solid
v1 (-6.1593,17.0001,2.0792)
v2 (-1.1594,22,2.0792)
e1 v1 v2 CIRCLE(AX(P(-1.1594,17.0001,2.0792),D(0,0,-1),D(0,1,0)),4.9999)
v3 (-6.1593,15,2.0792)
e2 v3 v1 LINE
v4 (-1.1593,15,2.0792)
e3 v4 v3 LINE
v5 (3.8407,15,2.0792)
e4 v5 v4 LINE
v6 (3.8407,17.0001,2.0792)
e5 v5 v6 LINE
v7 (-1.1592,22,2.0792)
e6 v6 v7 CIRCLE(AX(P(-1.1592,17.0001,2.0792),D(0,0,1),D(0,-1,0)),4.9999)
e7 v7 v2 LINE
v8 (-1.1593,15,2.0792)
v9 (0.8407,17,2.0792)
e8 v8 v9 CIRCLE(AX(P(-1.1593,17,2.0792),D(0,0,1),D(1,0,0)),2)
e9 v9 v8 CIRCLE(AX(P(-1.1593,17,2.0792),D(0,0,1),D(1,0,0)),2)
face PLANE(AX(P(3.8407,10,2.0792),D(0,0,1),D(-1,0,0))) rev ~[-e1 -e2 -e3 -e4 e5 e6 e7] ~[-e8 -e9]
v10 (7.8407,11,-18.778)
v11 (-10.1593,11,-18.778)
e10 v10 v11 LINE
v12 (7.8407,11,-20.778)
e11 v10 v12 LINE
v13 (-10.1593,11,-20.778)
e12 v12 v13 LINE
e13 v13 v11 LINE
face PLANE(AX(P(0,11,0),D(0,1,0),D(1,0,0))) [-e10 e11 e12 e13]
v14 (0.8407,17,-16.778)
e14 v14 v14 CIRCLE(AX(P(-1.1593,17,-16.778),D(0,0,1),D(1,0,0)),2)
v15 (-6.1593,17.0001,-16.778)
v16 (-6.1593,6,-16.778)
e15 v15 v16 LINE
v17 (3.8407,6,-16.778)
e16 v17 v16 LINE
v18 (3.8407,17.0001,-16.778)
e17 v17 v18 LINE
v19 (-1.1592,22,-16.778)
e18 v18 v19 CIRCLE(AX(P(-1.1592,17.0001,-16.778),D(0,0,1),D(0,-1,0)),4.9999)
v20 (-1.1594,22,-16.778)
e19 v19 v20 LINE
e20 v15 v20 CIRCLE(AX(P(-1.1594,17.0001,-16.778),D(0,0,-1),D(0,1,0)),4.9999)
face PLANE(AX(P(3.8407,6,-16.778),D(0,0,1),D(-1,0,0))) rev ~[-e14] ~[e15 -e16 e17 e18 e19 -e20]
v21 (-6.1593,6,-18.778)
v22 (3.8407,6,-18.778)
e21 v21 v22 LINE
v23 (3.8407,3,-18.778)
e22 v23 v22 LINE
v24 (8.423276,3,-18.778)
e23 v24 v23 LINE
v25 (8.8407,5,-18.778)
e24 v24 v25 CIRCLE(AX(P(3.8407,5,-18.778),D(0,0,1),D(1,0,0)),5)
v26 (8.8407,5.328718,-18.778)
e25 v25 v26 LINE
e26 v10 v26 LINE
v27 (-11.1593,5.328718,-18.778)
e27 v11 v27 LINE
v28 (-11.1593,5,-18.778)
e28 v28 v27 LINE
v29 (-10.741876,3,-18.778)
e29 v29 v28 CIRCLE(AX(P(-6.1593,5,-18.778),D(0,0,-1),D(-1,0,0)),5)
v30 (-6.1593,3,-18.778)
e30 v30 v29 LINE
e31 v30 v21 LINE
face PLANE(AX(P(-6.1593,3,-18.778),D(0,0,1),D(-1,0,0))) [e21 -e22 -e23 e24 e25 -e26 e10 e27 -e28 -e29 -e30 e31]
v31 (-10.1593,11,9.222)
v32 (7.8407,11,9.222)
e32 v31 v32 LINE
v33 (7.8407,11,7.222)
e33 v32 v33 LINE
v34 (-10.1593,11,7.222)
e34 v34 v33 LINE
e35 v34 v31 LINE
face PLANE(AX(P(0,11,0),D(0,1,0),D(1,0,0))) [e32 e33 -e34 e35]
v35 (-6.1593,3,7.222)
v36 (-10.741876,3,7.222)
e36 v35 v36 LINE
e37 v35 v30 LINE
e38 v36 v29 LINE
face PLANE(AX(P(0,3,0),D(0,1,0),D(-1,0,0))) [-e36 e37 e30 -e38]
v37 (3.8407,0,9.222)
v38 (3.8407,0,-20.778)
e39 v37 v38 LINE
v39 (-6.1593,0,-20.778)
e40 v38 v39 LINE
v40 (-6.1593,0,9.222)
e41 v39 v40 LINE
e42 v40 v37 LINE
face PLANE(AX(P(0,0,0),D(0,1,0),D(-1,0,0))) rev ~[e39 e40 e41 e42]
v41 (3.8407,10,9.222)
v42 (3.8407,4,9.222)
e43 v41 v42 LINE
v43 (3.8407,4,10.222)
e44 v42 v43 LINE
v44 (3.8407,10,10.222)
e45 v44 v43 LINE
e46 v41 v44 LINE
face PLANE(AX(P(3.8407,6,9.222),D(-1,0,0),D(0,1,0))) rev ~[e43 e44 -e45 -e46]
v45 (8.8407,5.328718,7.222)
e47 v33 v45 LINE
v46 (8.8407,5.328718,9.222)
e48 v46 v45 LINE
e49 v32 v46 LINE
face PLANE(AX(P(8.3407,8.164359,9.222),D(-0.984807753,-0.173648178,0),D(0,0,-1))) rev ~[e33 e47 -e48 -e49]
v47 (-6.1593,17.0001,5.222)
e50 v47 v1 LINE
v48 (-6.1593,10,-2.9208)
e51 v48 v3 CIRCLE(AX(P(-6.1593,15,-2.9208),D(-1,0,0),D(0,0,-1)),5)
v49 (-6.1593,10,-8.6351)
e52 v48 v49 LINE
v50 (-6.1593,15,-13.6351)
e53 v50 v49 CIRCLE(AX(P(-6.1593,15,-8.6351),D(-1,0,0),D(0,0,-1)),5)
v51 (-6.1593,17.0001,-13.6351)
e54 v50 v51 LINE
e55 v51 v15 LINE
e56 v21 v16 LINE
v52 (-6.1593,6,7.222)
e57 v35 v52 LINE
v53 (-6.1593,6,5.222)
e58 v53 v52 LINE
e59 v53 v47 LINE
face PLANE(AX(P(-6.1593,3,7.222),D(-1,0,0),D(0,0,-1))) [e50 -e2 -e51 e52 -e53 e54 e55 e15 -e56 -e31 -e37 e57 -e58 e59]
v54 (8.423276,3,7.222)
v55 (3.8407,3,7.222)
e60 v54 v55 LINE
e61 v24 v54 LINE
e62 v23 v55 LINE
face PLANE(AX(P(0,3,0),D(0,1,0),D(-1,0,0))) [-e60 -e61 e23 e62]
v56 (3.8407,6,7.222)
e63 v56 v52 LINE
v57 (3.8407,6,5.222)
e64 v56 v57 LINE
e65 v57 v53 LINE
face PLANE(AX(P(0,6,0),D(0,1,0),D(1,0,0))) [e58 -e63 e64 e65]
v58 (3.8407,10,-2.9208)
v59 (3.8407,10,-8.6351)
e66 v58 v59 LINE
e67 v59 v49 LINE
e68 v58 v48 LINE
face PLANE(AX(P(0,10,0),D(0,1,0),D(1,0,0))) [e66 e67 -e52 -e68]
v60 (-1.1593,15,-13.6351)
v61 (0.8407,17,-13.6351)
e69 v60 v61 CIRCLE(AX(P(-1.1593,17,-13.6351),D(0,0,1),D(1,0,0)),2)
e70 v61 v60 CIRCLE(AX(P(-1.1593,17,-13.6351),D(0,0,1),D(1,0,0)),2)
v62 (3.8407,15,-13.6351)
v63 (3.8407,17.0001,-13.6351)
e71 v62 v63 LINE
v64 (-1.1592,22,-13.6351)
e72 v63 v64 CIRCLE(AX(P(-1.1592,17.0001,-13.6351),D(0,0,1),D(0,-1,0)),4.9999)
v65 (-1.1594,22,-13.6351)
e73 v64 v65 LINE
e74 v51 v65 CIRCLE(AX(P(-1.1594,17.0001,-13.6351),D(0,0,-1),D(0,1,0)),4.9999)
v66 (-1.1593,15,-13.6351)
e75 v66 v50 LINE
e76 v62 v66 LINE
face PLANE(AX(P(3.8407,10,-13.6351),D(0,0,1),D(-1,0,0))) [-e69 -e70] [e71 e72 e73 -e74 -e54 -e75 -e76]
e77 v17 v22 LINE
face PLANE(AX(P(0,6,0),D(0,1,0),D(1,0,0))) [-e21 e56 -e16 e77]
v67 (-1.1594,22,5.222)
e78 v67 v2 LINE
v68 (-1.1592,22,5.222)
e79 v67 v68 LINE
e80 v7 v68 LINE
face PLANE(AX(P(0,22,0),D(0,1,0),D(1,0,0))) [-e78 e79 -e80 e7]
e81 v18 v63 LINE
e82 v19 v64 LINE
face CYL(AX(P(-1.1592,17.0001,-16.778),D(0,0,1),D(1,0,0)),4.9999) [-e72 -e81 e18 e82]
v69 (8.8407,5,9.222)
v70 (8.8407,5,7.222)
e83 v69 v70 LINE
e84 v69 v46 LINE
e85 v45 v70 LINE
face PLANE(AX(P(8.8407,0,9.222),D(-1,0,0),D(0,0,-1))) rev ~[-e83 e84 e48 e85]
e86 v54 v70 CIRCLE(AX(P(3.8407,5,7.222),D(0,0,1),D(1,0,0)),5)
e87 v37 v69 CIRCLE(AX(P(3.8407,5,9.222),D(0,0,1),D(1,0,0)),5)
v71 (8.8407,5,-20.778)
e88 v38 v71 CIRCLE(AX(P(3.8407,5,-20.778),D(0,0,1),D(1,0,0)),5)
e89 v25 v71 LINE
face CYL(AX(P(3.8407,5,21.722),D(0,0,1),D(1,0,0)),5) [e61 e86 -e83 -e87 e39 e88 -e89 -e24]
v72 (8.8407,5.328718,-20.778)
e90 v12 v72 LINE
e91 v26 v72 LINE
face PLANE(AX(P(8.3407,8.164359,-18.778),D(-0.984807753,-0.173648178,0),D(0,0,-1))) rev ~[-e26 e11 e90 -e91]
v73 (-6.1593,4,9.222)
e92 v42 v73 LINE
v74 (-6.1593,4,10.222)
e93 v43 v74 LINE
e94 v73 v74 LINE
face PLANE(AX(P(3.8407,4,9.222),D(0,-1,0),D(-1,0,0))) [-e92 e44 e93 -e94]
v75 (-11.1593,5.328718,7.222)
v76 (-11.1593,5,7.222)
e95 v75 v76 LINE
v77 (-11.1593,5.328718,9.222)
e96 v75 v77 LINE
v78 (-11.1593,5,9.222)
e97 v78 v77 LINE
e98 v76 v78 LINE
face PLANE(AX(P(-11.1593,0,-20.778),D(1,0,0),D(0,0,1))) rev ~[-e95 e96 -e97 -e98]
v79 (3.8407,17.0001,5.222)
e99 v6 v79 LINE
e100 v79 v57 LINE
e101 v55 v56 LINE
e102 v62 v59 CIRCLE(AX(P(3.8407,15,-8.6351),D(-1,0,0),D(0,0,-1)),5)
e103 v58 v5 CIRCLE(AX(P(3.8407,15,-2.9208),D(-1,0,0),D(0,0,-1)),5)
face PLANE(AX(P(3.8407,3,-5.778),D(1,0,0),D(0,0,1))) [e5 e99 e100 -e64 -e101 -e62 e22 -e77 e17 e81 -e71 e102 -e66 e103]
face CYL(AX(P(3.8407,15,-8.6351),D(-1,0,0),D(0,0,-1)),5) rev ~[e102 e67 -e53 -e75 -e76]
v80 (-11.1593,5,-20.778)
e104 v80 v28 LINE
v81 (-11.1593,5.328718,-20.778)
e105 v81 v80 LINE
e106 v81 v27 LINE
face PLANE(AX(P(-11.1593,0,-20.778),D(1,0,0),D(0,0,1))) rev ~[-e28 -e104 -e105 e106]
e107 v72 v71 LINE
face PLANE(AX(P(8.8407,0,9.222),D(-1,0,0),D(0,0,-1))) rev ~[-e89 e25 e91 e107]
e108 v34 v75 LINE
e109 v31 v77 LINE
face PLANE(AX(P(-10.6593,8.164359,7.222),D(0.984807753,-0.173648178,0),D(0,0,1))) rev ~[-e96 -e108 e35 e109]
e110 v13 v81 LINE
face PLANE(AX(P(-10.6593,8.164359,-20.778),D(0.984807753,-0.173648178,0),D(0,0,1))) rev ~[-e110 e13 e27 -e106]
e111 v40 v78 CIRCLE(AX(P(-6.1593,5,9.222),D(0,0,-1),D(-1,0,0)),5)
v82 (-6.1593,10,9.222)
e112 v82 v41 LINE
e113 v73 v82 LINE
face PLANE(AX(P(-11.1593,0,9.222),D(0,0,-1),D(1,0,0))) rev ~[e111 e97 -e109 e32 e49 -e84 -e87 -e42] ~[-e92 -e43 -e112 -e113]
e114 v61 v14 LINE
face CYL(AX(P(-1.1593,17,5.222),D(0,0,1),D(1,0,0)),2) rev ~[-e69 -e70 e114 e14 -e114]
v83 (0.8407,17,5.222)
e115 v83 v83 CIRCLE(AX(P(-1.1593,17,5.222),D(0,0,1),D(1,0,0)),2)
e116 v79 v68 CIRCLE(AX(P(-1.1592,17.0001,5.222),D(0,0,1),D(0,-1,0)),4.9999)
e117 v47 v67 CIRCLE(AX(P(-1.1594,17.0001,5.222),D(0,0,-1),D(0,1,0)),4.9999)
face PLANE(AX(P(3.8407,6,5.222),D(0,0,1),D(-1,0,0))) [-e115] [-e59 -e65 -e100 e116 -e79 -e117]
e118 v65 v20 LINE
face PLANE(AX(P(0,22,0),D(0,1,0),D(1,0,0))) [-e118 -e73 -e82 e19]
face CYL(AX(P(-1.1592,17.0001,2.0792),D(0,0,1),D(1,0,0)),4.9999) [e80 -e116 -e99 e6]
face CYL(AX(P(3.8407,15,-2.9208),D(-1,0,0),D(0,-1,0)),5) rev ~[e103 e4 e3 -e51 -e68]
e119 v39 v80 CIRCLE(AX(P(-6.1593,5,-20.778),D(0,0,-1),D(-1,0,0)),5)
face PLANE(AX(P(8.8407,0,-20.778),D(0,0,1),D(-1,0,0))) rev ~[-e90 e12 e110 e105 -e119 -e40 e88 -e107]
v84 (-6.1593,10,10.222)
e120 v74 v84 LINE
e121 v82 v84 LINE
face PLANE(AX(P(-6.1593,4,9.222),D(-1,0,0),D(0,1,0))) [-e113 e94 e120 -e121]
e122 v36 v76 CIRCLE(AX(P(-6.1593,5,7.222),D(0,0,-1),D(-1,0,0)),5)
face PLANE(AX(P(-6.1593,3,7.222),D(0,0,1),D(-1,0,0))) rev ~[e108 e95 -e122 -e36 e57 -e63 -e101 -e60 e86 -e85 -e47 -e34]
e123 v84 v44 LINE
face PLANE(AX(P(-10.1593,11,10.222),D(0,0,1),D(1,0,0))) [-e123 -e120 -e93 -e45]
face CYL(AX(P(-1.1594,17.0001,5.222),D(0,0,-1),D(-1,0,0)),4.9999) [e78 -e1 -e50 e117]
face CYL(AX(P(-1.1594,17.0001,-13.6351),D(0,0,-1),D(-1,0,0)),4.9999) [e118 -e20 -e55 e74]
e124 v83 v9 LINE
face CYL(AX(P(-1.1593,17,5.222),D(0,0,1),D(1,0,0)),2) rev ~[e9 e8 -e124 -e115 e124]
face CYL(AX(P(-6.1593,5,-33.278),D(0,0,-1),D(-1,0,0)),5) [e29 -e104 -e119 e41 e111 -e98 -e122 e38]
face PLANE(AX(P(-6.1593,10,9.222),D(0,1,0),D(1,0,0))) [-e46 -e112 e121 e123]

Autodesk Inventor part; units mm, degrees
ref_plane "YZ Plane" through (0, 0, 0) normal (1, 0, 0) x (0, 1, 0)
ref_plane "XZ Plane" through (0, 0, 0) normal (0, 1, 0) x (-1, 0, 0)
sketch "Sketch2" plane through (0, 0, 0) normal (0, 1, 0) x (-1, 0, 0)
  line L0 (11.1593, 9.222) -> (-8.8407, 9.222)
  line L1 (-8.8407, 9.222) -> (-8.8407, -20.778)
  line L2 (-8.8407, -20.778) -> (11.1593, -20.778)
  line L3 (11.1593, -20.778) -> (11.1593, 9.222)
  point P0 (0, 0)
  dimension "d23" = 30
  dimension "d24" = 20
extrude "Extrusion2" add sketch "Sketch2" along normal blind 3
sketch "Sketch3" plane through (0, 3, 0) normal (0, 1, 0) x (1, 0, 0)
  line L0 (8.8407, -9.222) -> (8.8407, 20.778) projected
  line L1 (8.8407, 20.778) -> (-11.1593, 20.778) projected
  line L2 (-11.1593, 20.778) -> (-11.1593, -9.222) projected
  line L3 (-11.1593, -9.222) -> (8.8407, -9.222) projected
  line L4 (8.8407, -9.222) -> (8.8407, 20.778) projected
  line L5 (8.8407, 5.778) -> (-11.1593, 5.778)
  line L6 (-11.1593, 20.778) -> (-11.1593, -9.222) projected
  line L7 (8.8407, -7.222) -> (-11.1593, -7.222)
  line L8 (3.8407, -7.222) -> (-6.1593, -7.222)
  line L9 (-6.1593, -7.222) -> (-6.1593, 5.778)
  line L10 (-6.1593, 5.778) -> (3.8407, 5.778)
  line L11 (3.8407, 5.778) -> (3.8407, -7.222)
  line L12 (8.8407, 20.778) -> (8.8407, -9.222)
  line L13 (-11.1593, -9.222) -> (-11.1593, 20.778)
  line L14 (-11.1593, 20.778) -> (8.8407, 20.778)
  line L15 (8.8407, 20.778) -> (8.8407, -9.222)
  line L16 (-11.1593, -9.222) -> (-11.1593, 20.778)
  line L17 (8.8407, 18.778) -> (-11.1593, 18.778)
  line L18 (3.8407, 18.778) -> (-6.1593, 18.778)
  line L19 (-6.1593, 18.778) -> (-6.1593, 5.778)
  line L20 (3.8407, 5.778) -> (3.8407, 18.778)
  point P0 (0, 0)
  point P1 (8.8407, 18.778)
  point P2 (-11.1593, 18.778)
  point P3 (-6.1593, 18.778)
  point P4 (-6.1593, -7.222)
  dimension "d27" = 2
  dimension "d28" = 10
  dimension "d29" = 5
  dimension "d53" = 20
extrude "Extrusion3" add sketch "Sketch3" along normal blind 3 contours L3 L2 L7 L0 | L7 L9 L5 L11 | L17 L2 L1 L0 | L5 L19 L17 L20
sketch "Sketch4" plane through (0, 6, 0) normal (0, 1, 0) x (1, 0, 0)
  line L0 (8.8407, -7.222) -> (3.8407, -7.222) projected
  line L1 (8.8407, -9.222) -> (8.8407, -7.222) projected
  line L2 (8.8407, -7.222) -> (3.8407, -7.222) projected
  line L3 (3.8407, -7.222) -> (3.8407, 18.778) projected
  line L4 (3.8407, 18.778) -> (8.8407, 18.778) projected
  line L5 (8.8407, 18.778) -> (8.8407, 20.778) projected
  line L6 (8.8407, 20.778) -> (-11.1593, 20.778) projected
  line L7 (-11.1593, 20.778) -> (-11.1593, 18.778) projected
  line L8 (-11.1593, 18.778) -> (-6.1593, 18.778) projected
  line L9 (-6.1593, 18.778) -> (-6.1593, -7.222) projected
  line L10 (-6.1593, -7.222) -> (-11.1593, -7.222) projected
  line L11 (-11.1593, -7.222) -> (-11.1593, -9.222) projected
  line L12 (-11.1593, -9.222) -> (8.8407, -9.222) projected
  line L13 (8.8407, -7.222) -> (-11.1593, -7.222)
  line L14 (8.8407, -9.222) -> (8.8407, 20.778) projected
  line L15 (-11.1593, 18.778) -> (-11.1593, -7.222) projected
  line L16 (-11.1593, 18.778) -> (8.8407, 18.778)
  point P0 (0, 0)
extrude "Extrusion4" add sketch "Sketch4" along normal blind 5 contours L1 L12 L11 L10 L13 L0 | L4 L16 L8 L7 L6 L5
ref_plane "Work Plane1" through (8.8407, 0, -5.778) normal (0, 0, -1) x (-1, 0, 0)
chamfer "Chamfer1" distance 1 angle 80 2 edges at (8.8407, 11, 8.222) (-11.1593, 11, 8.222) measured on face at (2.174, 11, 8.5554)
chamfer "Chamfer2" distance 1 angle 80 2 edges at (8.8407, 11, -19.778) (-11.1593, 11, -19.778) measured on face at (2.174, 11, -19.4446)
sketch "Sketch5" plane through (0, 6, 0) normal (0, 1, 0) x (1, 0, 0)
  line L0 (-6.1593, -7.222) -> (3.8407, -7.222) projected
  line L1 (3.8407, -7.222) -> (3.8407, 18.778) projected
  line L2 (3.8407, 18.778) -> (-6.1593, 18.778) projected
  line L3 (-6.1593, 18.778) -> (-6.1593, -7.222) projected
  line L4 (3.8407, -5.222) -> (-6.1593, -5.222)
  line L5 (-6.1593, 18.778) -> (-6.1593, -7.222) projected
  line L6 (-15.1593, 5.778) -> (12.8407, 5.778) projected
  line L7 (3.8407, 16.778) -> (-6.1593, 16.778)
  point P0 (0, 0)
  point P1 (3.8407, 16.778)
  point P2 (-6.1593, 16.778)
  dimension "d40" = 11
  dimension "d54" = 26
extrude "Extrusion5" add sketch "Sketch5" along normal blind 4 contours L3 L6 L1 L4 | L3 L7 L1 L6
sketch "Sketch6" plane through (0, 10, 0) normal (0, 1, 0) x (1, 0, 0)
  line L0 (-6.1593, -7.222) -> (-6.1593, 18.778) projected
  line L1 (3.8407, 18.778) -> (3.8407, -7.222) projected
  line L2 (3.8407, -5.222) -> (3.8407, -2.0792)
  line L3 (3.8407, -2.0792) -> (-6.1593, -2.0792)
  line L4 (-6.1593, -2.0792) -> (-6.1593, -5.222)
  line L5 (3.8407, 16.778) -> (-6.1593, 16.778) projected
  line L6 (-6.1593, -5.222) -> (3.8407, -5.222) projected
  line L7 (-6.1593, 5.778) -> (3.8407, 5.778)
  line L8 (3.8407, 13.6351) -> (-6.1593, 13.6351)
  point P0 (0, 0)
  point P1 (-6.1593, -2.0792)
  point P2 (-6.1593, 13.6351)
  point P3 (3.8407, 13.6351)
  dimension "d43" = 22
  dimension "d44" = 3.1429
extrude "Extrusion6" add sketch "Sketch6" along normal blind 12 contours L0 L3 L1 L6 | L0 L5 L1 L8
fillet "Fillet1" radius 5 4 edges at (3.8407, 22, 3.6506) (-6.1593, 22, 3.6506) (-6.1593, 22, -15.2065) (3.8407, 22, -15.2065)
fillet "Fillet2" radius 5 2 edges at (-11.1593, 0, -5.778) (8.8407, 0, -5.778)
fillet "Fillet3" radius 5 2 edges at (-1.1593, 10, -13.6351) (-1.1593, 10, 2.0792)
sketch "Sketch9" plane through (-10.1593, 11, 9.222) normal (0, 0, 1) x (1, 0, 0)
  line L0 (0, 0) -> (18, 0) projected
  line L1 (4, -5) -> (4, 6) projected
  line L2 (14, -5) -> (14, 6) projected
  line L3 (0, 0) -> (18, 0) projected
  line L4 (4, 0) -> (14, 0)
  line L5 (14, 0) -> (14, -7)
  line L6 (14, -7) -> (4, -7)
  line L7 (4, -7) -> (4, 0)
  line L8 (4, -1) -> (14, -1)
  point P0 (10.1593, -11)
  point P1 (14, -1)
  point P2 (4, -1)
  dimension "d58" = 6
  dimension "d59" = 1
  dimension "d62" = 10
extrude "Extrusion8" add sketch "Sketch9" along normal blind 1 contours L8 L2 L5 L6 L7 L1
sketch "Sketch10" plane through (-6.1593, 6, 5.222) normal (0, 0, 1) x (1, 0, 0)
  circle A0 centre (5, 11) radius 2
  arc A1 (10, 11) -> (0, 11) centre (5, 11) ccw projected
  point P0 (6.1593, -6)
  dimension "d63" = 4
extrude "Extrusion9" cut sketch "Sketch10" against normal through all
equation "\"d27\" = 0.1 * d53"
equation "\"d28\" = 0.5 * d53"
equation "\"d29\" = 0.25 * d53"
equation "\"d44\" = 0.142857 * d43"
properties part number "uchytka_spojky_medzi_velkym_strednym"
